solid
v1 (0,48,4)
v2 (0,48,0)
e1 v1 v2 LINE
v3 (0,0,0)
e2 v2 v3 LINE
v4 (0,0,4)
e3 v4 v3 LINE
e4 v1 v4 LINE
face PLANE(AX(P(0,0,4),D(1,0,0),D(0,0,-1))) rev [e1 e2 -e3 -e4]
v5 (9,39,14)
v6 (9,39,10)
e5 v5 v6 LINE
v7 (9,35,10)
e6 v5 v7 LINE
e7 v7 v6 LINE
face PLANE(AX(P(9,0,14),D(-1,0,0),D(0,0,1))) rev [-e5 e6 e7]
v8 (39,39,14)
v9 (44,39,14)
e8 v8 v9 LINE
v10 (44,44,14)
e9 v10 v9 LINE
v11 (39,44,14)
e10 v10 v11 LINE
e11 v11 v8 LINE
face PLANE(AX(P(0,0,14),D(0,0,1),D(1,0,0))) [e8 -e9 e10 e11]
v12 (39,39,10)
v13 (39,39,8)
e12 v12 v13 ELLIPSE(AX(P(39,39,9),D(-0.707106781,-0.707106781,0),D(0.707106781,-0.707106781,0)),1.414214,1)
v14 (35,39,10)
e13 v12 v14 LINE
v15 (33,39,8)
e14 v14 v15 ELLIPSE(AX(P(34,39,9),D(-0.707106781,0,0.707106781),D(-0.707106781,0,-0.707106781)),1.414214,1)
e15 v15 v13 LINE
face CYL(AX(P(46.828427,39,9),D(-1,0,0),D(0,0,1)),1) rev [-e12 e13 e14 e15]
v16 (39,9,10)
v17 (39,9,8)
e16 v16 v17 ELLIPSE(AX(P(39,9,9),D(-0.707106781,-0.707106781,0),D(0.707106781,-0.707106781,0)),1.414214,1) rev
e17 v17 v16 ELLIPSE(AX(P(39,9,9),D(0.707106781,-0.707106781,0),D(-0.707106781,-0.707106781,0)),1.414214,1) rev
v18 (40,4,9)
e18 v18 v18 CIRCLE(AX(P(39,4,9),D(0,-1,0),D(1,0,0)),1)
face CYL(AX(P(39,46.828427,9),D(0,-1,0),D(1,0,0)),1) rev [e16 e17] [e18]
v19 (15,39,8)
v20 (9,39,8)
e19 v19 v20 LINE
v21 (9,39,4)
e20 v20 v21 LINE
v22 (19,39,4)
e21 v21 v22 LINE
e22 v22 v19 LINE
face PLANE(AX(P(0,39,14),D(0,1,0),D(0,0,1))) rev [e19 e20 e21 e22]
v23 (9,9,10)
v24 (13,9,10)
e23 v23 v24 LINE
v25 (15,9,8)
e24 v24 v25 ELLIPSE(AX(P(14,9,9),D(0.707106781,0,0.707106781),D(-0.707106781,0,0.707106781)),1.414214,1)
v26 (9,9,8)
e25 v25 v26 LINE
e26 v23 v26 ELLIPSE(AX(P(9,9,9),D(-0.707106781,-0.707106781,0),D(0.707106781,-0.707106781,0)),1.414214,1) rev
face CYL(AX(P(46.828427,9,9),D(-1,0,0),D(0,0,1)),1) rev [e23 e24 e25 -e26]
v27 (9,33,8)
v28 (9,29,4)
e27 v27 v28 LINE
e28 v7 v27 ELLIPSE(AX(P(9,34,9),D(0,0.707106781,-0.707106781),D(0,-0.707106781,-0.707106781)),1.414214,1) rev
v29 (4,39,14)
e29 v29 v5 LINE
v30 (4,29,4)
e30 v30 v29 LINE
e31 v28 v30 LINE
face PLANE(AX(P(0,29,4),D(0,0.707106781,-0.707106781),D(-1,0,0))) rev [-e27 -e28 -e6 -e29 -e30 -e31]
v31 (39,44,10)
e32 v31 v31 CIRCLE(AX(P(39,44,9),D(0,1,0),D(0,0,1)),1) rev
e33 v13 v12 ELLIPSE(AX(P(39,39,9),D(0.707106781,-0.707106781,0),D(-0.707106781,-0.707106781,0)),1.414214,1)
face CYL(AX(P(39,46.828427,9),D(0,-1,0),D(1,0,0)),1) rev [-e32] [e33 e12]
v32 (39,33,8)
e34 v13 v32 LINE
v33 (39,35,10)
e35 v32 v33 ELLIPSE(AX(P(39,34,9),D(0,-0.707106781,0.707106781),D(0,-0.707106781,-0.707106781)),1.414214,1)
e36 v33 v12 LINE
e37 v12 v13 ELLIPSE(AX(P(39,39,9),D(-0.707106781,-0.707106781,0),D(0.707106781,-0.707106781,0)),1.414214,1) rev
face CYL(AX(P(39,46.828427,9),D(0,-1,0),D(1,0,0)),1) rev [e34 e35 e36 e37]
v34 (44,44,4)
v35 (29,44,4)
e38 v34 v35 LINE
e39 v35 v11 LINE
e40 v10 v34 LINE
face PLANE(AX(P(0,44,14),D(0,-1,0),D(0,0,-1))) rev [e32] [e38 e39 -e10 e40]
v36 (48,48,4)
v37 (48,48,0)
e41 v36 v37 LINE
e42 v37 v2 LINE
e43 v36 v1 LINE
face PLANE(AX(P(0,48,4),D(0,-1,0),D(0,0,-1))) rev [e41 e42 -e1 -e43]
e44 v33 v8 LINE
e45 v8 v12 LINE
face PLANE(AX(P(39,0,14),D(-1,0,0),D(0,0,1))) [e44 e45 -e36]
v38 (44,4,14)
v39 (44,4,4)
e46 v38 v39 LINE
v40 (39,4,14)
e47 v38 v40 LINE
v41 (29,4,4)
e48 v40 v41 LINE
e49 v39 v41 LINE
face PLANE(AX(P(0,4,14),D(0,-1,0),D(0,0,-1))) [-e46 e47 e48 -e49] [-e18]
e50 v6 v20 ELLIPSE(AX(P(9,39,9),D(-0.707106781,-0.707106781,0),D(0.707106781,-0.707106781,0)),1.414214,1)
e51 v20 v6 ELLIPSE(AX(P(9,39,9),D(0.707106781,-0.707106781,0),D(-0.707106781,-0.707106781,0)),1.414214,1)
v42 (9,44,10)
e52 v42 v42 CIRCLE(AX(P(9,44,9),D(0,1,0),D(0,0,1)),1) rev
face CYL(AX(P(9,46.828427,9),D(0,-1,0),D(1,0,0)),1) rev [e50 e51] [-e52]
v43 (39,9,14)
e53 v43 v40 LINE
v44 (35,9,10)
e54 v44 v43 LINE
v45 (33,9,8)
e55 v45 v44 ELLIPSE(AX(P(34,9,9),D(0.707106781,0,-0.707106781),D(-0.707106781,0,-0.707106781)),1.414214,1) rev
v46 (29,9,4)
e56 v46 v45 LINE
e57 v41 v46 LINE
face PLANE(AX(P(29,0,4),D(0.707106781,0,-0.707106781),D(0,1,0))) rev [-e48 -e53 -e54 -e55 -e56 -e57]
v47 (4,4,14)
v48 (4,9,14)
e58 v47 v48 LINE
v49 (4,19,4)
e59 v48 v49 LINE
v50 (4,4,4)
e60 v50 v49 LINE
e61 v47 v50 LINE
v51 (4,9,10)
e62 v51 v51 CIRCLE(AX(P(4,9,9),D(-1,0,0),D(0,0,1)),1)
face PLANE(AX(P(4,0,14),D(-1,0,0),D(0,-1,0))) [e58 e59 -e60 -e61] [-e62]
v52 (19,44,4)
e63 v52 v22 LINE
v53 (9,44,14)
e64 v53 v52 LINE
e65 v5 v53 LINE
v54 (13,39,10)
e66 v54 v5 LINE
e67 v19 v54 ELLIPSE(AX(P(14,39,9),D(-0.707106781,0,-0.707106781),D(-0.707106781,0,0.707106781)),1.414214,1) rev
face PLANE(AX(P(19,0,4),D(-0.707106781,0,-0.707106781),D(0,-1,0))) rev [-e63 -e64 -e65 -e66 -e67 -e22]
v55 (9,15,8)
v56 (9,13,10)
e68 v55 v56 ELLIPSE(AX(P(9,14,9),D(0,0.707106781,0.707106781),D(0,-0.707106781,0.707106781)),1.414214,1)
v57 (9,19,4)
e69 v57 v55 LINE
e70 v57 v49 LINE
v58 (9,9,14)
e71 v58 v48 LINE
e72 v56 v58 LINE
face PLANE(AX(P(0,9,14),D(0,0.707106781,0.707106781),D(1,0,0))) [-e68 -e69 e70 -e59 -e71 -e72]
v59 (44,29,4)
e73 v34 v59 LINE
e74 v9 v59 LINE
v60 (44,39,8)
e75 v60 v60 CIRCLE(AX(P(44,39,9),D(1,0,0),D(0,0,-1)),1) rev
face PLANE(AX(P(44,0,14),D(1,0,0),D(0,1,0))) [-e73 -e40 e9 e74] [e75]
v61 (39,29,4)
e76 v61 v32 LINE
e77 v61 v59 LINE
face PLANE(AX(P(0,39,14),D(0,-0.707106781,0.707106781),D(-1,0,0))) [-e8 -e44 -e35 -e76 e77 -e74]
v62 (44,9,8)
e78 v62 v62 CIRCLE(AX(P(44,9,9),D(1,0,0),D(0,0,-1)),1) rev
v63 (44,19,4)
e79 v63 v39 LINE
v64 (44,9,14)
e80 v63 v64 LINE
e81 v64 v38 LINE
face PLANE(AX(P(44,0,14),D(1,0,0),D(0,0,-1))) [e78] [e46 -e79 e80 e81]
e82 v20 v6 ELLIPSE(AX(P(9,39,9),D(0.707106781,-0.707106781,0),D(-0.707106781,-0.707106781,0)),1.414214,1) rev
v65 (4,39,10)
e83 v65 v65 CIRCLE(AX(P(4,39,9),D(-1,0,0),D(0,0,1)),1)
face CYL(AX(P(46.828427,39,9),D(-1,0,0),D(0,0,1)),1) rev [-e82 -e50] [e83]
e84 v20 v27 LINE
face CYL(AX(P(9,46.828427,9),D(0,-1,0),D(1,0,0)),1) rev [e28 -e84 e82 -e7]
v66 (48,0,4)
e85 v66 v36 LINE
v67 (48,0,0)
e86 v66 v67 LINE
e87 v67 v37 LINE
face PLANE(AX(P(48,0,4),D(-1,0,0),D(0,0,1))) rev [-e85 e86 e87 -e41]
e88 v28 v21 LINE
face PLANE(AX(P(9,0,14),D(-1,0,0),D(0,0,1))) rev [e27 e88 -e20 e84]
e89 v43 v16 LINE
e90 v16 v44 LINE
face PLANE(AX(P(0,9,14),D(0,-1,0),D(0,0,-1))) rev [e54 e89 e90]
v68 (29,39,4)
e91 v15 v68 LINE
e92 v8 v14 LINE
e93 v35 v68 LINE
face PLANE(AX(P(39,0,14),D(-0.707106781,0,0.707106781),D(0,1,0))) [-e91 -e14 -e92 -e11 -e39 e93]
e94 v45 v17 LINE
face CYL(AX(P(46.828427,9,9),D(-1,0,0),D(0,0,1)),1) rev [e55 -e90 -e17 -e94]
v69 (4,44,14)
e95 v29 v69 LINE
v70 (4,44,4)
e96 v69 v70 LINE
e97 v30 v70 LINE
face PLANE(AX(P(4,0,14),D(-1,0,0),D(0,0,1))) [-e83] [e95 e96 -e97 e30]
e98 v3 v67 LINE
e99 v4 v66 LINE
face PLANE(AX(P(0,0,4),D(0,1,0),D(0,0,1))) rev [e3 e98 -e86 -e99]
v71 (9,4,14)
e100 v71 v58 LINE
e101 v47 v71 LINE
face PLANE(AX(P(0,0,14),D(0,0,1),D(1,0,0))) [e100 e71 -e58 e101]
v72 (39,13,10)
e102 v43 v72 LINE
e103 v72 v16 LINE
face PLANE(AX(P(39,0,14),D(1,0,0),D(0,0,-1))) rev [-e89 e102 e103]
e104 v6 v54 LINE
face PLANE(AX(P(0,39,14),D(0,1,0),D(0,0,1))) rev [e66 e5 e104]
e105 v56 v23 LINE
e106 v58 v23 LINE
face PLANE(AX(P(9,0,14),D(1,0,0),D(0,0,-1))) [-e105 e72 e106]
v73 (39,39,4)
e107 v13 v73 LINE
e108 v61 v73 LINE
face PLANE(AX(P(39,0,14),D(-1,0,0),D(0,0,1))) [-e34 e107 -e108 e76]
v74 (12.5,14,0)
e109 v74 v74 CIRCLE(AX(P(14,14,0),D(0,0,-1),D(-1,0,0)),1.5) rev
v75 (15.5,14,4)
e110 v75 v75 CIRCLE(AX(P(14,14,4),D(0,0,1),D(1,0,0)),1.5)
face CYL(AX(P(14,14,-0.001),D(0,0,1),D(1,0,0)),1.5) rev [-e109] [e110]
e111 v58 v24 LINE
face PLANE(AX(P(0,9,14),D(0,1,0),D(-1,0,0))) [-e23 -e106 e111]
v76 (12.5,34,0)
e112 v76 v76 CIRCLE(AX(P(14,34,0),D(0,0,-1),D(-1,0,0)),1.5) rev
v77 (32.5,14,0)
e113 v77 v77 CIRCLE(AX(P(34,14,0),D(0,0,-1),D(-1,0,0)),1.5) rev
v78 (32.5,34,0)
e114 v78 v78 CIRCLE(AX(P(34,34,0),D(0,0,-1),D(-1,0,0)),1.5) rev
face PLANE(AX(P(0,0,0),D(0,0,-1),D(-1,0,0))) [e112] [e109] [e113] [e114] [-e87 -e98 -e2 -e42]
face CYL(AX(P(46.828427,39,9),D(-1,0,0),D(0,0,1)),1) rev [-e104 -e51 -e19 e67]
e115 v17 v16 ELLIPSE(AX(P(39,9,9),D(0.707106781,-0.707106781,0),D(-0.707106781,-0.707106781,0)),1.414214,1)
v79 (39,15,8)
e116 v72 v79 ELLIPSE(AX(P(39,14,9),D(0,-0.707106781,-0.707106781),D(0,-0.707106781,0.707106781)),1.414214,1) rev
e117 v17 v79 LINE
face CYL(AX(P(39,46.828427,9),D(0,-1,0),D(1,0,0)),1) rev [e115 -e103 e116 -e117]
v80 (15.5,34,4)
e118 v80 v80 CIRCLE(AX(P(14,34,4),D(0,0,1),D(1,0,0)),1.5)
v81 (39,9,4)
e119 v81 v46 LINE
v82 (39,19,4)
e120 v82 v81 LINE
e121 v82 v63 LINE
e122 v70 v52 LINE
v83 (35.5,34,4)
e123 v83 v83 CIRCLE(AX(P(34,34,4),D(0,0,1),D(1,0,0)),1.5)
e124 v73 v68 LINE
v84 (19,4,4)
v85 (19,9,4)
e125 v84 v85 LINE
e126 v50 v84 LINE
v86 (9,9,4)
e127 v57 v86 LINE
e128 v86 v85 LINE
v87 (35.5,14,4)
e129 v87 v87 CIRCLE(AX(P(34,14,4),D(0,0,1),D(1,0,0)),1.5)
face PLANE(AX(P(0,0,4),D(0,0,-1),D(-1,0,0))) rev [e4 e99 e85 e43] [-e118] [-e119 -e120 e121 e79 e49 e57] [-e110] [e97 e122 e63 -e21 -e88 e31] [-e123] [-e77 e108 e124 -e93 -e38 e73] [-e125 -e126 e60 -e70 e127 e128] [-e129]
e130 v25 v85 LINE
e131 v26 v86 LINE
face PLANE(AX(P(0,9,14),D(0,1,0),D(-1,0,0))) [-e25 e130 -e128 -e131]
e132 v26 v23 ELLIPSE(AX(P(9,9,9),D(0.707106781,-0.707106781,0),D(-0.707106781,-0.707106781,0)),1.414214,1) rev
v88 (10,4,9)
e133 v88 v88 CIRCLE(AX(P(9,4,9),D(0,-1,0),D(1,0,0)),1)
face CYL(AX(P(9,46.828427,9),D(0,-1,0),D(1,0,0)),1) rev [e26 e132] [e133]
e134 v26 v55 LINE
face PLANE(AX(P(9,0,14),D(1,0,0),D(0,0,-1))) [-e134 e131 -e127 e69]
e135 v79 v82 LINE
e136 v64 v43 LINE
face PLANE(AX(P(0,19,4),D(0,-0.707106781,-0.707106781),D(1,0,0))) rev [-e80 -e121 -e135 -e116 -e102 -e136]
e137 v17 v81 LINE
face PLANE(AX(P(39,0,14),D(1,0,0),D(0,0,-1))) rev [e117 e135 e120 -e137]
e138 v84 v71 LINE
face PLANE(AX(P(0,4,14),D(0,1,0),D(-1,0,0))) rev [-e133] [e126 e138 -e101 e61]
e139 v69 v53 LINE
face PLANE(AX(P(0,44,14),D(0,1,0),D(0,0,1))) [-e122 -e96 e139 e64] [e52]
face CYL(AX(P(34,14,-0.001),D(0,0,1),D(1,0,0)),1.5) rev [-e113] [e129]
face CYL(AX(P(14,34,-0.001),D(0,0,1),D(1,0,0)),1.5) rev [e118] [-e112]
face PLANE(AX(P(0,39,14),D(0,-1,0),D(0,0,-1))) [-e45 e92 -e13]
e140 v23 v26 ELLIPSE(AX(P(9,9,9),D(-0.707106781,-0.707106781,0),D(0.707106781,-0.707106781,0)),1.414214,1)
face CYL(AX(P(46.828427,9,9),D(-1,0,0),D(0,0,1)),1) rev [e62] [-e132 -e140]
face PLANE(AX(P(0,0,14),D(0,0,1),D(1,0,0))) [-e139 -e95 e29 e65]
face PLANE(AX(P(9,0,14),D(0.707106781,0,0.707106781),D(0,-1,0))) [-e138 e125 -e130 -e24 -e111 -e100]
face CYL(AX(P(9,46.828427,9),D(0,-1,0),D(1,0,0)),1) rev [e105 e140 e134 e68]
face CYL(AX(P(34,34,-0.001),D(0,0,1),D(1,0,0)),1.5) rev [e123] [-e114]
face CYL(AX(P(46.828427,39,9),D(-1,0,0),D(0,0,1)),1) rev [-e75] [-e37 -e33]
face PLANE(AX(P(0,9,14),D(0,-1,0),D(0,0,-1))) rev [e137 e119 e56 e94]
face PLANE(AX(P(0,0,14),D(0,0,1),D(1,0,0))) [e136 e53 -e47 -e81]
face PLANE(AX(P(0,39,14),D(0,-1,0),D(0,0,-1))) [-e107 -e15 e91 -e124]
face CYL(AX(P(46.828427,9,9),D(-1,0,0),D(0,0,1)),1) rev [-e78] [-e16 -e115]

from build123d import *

# Parameters (mm, degrees)
SKIZZE1_W                       = 48
SKIZZE1_H                       = 48
AUFSATZ_LINEAR_AUSTRAGEN1_DEPTH = 4
SKIZZE2_W                       = 5
SKIZZE2_H                       = 10
SKIZZE2_W_2                     = 15
SKIZZE2_H_2                     = 5
AUFSATZ_LINEAR_AUSTRAGEN3_DEPTH = 10
FASE1_SIZE                      = 10
SCHNITT_LINEAR_AUSTRAGEN1_REACH = 68.603
SKIZZE3_R                       = 1
SCHNITT_LINEAR_AUSTRAGEN2_REACH = 68.603
SKIZZE4_R                       = 1
SCHNITT_LINEAR_AUSTRAGEN3_REACH = 70.615
SKIZZE5_R                       = 1.5


with BuildPart() as part:
    # Skizze1 → Aufsatz-Linear austragen1 (new body)
    with BuildSketch(Plane.XY):
        with Locations((24, 24)):
            Rectangle(SKIZZE1_W, SKIZZE1_H)
    extrude(amount=AUFSATZ_LINEAR_AUSTRAGEN1_DEPTH)

    # Skizze2 → Aufsatz-Linear austragen3 (add)
    with BuildSketch(Plane.XY.offset(4)):
        with Locations((6.5, 34)):
            Rectangle(SKIZZE2_W, SKIZZE2_H)
        with Locations((11.5, 41.5)):
            Rectangle(SKIZZE2_W_2, SKIZZE2_H_2)
        with Locations((36.5, 41.5)):
            Rectangle(SKIZZE2_W_2, SKIZZE2_H_2)
        with Locations((41.5, 34)):
            Rectangle(SKIZZE2_W, SKIZZE2_H)
        with Locations((41.5, 14)):
            Rectangle(SKIZZE2_W, SKIZZE2_H)
        with Locations((36.5, 6.5)):
            Rectangle(SKIZZE2_W_2, SKIZZE2_H_2)
        with Locations((11.5, 6.5)):
            Rectangle(SKIZZE2_W_2, SKIZZE2_H_2)
        with Locations((6.5, 14)):
            Rectangle(SKIZZE2_W, SKIZZE2_H)
    extrude(amount=AUFSATZ_LINEAR_AUSTRAGEN3_DEPTH)

    # Fase1
    fase1_edges = [part.edges().sort_by_distance(p)[0] for p in [
        (19, 41.5, 14),
        (29, 41.5, 14),
        (41.5, 29, 14),
        (41.5, 19, 14),
        (29, 6.5, 14),
        (6.5, 19, 14),
        (6.5, 29, 14),
        (19, 6.5, 14),
    ]]
    chamfer(fase1_edges, length=FASE1_SIZE - 0.0001)  # a hair under: the kernel refuses the full size

    # Schnitt-Linear austragen1: up to this face of the body (flat: up to its plane)
    schnitt_linear_austragen1_end = Plane(part.part.faces().sort_by_distance((9.4167125, 44, 8.166675))[0])
    # Skizze3 → Schnitt-Linear austragen1 (cut, up to the picked face)
    with BuildSketch(Plane.XZ.offset(-4), mode=Mode.PRIVATE) as schnitt_linear_austragen1_sk1:
        with Locations(Location((9, 9, 0), (0, 0, 90))):
            Circle(SKIZZE3_R)
    schnitt_linear_austragen1_tool1 = split(extrude(schnitt_linear_austragen1_sk1.sketch, amount=-SCHNITT_LINEAR_AUSTRAGEN1_REACH, mode=Mode.PRIVATE), bisect_by=schnitt_linear_austragen1_end, keep=Keep.BOTH, mode=Mode.PRIVATE)
    # Skizze3 → Schnitt-Linear austragen1 (cut, up to the picked face)
    with BuildSketch(Plane.XZ.offset(-4), mode=Mode.PRIVATE) as schnitt_linear_austragen1_sk2:
        with Locations((39, 9)):
            Circle(SKIZZE3_R)
    schnitt_linear_austragen1_tool2 = split(extrude(schnitt_linear_austragen1_sk2.sketch, amount=-SCHNITT_LINEAR_AUSTRAGEN1_REACH, mode=Mode.PRIVATE), bisect_by=schnitt_linear_austragen1_end, keep=Keep.BOTH, mode=Mode.PRIVATE)
    add(schnitt_linear_austragen1_tool1.solids().sort_by(Axis((9, 4, 9), (0, 1, 0)))[0], mode=Mode.SUBTRACT)
    add(schnitt_linear_austragen1_tool2.solids().sort_by(Axis((39, 4, 9), (0, 1, 0)))[0], mode=Mode.SUBTRACT)

    # Schnitt-Linear austragen2: up to this face of the body (flat: up to its plane)
    schnitt_linear_austragen2_end = Plane(part.part.faces().sort_by_distance((44, 9.4167125, 8.166675))[0])
    # Skizze4 → Schnitt-Linear austragen2 (cut, up to the picked face)
    with BuildSketch(Plane.ZY.offset(-4), mode=Mode.PRIVATE) as schnitt_linear_austragen2_sk1:
        with Locations(Location((9, 39, 0), (0, 0, 180))):
            Circle(SKIZZE4_R)
    schnitt_linear_austragen2_tool1 = split(extrude(schnitt_linear_austragen2_sk1.sketch, amount=-SCHNITT_LINEAR_AUSTRAGEN2_REACH, mode=Mode.PRIVATE), bisect_by=schnitt_linear_austragen2_end, keep=Keep.BOTH, mode=Mode.PRIVATE)
    # Skizze4 → Schnitt-Linear austragen2 (cut, up to the picked face)
    with BuildSketch(Plane.ZY.offset(-4), mode=Mode.PRIVATE) as schnitt_linear_austragen2_sk2:
        with Locations(Location((9, 9, 0), (0, 0, 180))):
            Circle(SKIZZE4_R)
    schnitt_linear_austragen2_tool2 = split(extrude(schnitt_linear_austragen2_sk2.sketch, amount=-SCHNITT_LINEAR_AUSTRAGEN2_REACH, mode=Mode.PRIVATE), bisect_by=schnitt_linear_austragen2_end, keep=Keep.BOTH, mode=Mode.PRIVATE)
    add(schnitt_linear_austragen2_tool1.solids().sort_by(Axis((4, 39, 9), (1, 0, 0)))[0], mode=Mode.SUBTRACT)
    add(schnitt_linear_austragen2_tool2.solids().sort_by(Axis((4, 9, 9), (1, 0, 0)))[0], mode=Mode.SUBTRACT)

    # Skizze5 → Schnitt-Linear austragen3 (cut, up to next)
    with BuildSketch(Plane.XY.offset(4), mode=Mode.PRIVATE) as schnitt_linear_austragen3_sk1:
        with Locations((34, 14)):
            Circle(SKIZZE5_R)
    schnitt_linear_austragen3_tool1 = extrude(schnitt_linear_austragen3_sk1.sketch, amount=-SCHNITT_LINEAR_AUSTRAGEN3_REACH, mode=Mode.PRIVATE) & part.part
    # Skizze5 → Schnitt-Linear austragen3 (cut, up to next)
    with BuildSketch(Plane.XY.offset(4), mode=Mode.PRIVATE) as schnitt_linear_austragen3_sk2:
        with Locations((14, 14)):
            Circle(SKIZZE5_R)
    schnitt_linear_austragen3_tool2 = extrude(schnitt_linear_austragen3_sk2.sketch, amount=-SCHNITT_LINEAR_AUSTRAGEN3_REACH, mode=Mode.PRIVATE) & part.part
    # Skizze5 → Schnitt-Linear austragen3 (cut, up to next)
    with BuildSketch(Plane.XY.offset(4), mode=Mode.PRIVATE) as schnitt_linear_austragen3_sk3:
        with Locations((14, 34)):
            Circle(SKIZZE5_R)
    schnitt_linear_austragen3_tool3 = extrude(schnitt_linear_austragen3_sk3.sketch, amount=-SCHNITT_LINEAR_AUSTRAGEN3_REACH, mode=Mode.PRIVATE) & part.part
    # Skizze5 → Schnitt-Linear austragen3 (cut, up to next)
    with BuildSketch(Plane.XY.offset(4), mode=Mode.PRIVATE) as schnitt_linear_austragen3_sk4:
        with Locations((34, 34)):
            Circle(SKIZZE5_R)
    schnitt_linear_austragen3_tool4 = extrude(schnitt_linear_austragen3_sk4.sketch, amount=-SCHNITT_LINEAR_AUSTRAGEN3_REACH, mode=Mode.PRIVATE) & part.part
    add(schnitt_linear_austragen3_tool1.solids().sort_by_distance((34, 14, 4))[0], mode=Mode.SUBTRACT)
    add(schnitt_linear_austragen3_tool2.solids().sort_by_distance((14, 14, 4))[0], mode=Mode.SUBTRACT)
    add(schnitt_linear_austragen3_tool3.solids().sort_by_distance((14, 34, 4))[0], mode=Mode.SUBTRACT)
    add(schnitt_linear_austragen3_tool4.solids().sort_by_distance((34, 34, 4))[0], mode=Mode.SUBTRACT)


solid = part.part
